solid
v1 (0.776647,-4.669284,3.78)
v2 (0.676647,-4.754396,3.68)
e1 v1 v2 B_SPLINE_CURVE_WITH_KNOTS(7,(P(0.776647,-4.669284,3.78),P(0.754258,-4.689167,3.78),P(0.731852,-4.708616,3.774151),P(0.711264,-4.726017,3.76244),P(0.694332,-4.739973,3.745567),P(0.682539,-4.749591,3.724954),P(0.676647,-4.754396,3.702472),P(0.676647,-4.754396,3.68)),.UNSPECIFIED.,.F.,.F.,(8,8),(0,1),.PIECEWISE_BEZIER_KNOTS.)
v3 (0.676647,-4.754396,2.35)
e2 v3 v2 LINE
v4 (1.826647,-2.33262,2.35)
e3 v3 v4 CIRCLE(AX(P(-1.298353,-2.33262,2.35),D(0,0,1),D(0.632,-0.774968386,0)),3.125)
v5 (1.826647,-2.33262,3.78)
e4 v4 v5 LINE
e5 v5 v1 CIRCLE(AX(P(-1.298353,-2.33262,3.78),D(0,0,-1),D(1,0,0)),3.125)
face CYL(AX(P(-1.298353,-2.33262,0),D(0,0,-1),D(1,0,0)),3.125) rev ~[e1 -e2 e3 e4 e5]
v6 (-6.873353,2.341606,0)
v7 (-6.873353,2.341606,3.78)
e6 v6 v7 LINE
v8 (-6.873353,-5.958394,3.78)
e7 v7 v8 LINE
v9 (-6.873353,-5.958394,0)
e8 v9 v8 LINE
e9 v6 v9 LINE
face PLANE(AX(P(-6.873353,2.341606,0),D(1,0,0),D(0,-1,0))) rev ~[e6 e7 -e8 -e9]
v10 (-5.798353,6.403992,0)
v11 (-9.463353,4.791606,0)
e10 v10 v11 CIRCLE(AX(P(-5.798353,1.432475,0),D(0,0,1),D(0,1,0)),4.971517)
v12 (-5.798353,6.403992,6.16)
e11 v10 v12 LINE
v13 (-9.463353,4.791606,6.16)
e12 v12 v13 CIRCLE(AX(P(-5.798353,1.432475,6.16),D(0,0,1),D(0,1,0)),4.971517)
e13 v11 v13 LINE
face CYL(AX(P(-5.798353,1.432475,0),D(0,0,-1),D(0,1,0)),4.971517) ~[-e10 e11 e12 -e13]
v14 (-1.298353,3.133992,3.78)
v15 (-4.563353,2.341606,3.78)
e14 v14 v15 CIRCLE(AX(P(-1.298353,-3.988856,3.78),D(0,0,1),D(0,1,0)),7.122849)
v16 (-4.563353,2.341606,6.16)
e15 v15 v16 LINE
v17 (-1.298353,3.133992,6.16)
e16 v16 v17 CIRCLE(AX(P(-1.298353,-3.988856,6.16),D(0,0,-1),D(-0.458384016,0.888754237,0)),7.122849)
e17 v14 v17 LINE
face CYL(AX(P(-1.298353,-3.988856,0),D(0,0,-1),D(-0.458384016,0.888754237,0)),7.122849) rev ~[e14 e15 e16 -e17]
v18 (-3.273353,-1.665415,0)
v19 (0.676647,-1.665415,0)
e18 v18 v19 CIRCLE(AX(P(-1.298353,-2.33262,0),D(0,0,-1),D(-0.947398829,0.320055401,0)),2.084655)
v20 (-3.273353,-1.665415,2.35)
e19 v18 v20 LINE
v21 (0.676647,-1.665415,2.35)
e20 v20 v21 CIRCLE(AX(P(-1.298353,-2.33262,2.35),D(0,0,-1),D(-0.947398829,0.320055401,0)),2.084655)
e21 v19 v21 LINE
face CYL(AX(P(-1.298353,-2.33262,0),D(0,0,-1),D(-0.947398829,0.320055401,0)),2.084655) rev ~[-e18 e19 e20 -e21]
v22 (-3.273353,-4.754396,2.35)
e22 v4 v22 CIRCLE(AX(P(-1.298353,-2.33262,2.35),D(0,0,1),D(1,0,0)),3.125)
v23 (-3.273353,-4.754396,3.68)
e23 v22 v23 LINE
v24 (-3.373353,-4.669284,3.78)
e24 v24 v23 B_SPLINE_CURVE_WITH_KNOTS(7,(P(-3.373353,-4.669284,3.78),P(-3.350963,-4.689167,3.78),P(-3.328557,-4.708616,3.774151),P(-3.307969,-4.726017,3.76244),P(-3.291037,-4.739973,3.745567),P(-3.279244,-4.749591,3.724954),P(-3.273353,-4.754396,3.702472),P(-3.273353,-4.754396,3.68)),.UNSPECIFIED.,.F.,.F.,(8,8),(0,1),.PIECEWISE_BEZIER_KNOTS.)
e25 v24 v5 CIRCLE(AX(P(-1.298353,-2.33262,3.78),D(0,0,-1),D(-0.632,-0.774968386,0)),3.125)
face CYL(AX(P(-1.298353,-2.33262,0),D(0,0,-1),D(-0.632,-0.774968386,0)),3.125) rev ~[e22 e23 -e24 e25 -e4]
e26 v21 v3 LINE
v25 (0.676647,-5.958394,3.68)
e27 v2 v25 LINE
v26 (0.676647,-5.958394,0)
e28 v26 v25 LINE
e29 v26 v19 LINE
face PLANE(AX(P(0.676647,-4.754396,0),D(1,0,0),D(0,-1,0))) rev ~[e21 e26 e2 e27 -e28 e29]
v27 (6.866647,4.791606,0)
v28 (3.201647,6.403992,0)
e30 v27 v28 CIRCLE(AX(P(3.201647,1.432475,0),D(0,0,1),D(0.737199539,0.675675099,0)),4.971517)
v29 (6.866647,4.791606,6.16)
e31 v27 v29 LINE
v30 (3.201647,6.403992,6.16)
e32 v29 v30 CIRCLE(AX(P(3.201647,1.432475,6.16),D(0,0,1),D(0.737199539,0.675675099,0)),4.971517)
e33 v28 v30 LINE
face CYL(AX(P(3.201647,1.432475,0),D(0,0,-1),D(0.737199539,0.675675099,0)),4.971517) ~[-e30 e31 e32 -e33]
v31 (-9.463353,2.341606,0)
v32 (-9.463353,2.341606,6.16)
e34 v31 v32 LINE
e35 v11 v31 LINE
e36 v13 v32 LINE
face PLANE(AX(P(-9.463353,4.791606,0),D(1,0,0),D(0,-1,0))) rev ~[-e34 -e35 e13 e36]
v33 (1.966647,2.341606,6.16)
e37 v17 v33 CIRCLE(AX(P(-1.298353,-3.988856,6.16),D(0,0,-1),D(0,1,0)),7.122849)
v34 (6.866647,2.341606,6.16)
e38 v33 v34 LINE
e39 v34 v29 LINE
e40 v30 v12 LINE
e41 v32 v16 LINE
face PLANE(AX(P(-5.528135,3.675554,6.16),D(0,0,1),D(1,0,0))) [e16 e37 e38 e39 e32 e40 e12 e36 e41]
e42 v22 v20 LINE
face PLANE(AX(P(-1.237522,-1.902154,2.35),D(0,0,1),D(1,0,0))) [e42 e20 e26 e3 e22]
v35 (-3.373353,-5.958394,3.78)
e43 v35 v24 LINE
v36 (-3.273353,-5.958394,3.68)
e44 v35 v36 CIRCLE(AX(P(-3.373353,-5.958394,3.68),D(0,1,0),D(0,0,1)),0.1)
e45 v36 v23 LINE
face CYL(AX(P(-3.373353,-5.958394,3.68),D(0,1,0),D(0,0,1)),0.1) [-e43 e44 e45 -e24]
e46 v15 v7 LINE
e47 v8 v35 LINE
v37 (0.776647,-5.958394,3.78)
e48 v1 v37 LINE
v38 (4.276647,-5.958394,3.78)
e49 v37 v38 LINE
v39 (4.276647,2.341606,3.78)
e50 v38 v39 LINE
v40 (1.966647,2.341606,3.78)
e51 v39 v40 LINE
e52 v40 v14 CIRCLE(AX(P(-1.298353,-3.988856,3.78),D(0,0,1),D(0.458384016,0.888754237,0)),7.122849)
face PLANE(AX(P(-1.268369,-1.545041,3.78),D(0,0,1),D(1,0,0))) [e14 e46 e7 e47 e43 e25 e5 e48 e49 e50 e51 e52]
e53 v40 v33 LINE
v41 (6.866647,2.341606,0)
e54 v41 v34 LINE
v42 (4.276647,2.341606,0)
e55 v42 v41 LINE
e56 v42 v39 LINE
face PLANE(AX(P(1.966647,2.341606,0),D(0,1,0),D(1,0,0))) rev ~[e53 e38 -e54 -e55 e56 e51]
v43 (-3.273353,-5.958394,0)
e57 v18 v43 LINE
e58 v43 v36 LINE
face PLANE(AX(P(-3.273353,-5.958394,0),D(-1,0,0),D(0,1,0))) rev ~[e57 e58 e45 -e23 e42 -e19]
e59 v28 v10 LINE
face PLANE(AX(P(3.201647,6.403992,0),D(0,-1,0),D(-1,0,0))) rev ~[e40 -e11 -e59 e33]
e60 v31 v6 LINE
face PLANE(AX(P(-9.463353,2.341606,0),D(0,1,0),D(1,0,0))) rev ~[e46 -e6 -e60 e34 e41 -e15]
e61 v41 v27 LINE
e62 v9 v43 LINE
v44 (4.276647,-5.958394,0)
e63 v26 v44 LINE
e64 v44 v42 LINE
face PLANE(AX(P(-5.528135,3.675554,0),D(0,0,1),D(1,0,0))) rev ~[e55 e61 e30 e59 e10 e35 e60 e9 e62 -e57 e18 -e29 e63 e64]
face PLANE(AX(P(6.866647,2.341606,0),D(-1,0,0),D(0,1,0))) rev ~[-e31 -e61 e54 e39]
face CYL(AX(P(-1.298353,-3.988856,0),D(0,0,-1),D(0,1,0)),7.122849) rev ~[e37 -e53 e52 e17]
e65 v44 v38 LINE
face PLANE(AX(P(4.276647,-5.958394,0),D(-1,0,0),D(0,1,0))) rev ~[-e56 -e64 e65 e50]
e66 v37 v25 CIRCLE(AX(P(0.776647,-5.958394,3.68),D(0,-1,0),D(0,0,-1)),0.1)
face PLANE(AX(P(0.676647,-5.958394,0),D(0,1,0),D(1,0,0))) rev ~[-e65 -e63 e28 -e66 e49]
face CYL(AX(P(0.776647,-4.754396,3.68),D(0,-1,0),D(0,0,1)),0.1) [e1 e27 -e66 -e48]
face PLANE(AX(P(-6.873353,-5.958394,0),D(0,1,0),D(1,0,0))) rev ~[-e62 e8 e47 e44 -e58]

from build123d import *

# Parameters (mm, degrees)
F1_DEPTH = 2.35
F2_DEPTH = 3.78
F3_DEPTH = 6.16
F4_R     = 0.1
F5_R     = 0.1


# Not quite as in the source:
# - a feature names something its author has since deleted; it is built from what else it names


with BuildPart() as f1:
    # F0 (on Top) → F1 (new body)
    with BuildSketch(Plane.XY):
        with BuildLine():
            Line((0.6766474014, -1.6654146139), (0.6766474014, -4.7543960131))
            ThreePointArc((0.6766474014, -4.7543960131), (1.524544849, -3.6730954673), (1.8266474014, -2.3326198054))
            ThreePointArc((1.8266474014, -2.3326198054), (-2.6388282605, 0.4902776422), (-3.2733525986, -4.7543960131))
            Line((-3.2733525986, -4.7543960131), (-3.2733525986, -1.6654146139))
            ThreePointArc((-3.2733525986, -1.6654146139), (-1.2983525986, -0.247964494), (0.6766474014, -1.6654146139))
        make_face()
    extrude(amount=F1_DEPTH)

    # F0 (on Top) → F2 (join)
    with BuildSketch(Plane.XY):
        with BuildLine():
            Line((4.2766474014, -5.9583943095), (4.2766474014, 2.3416056905))
            Line((4.2766474014, 2.3416056905), (1.9666474014, 2.3416056905))
            ThreePointArc((1.9666474014, 2.3416056905), (0.3815359204, 2.9330616855), (-1.2983525986, 3.1339924307))
            ThreePointArc((-1.2983525986, 3.1339924307), (-2.9782411177, 2.9330616855), (-4.5633525986, 2.3416056905))
            Line((-4.5633525986, 2.3416056905), (-6.8733525986, 2.3416056905))
            Line((-6.8733525986, 2.3416056905), (-6.8733525986, -5.9583943095))
            Line((-6.8733525986, -5.9583943095), (-3.2733525986, -5.9583943095))
            Line((-3.2733525986, -5.9583943095), (-3.2733525986, -4.7543960131))
            ThreePointArc((-3.2733525986, -4.7543960131), (-2.6388282605, 0.4902776422), (1.8266474014, -2.3326198054))
            ThreePointArc((1.8266474014, -2.3326198054), (1.524544849, -3.6730954673), (0.6766474014, -4.7543960131))
            Line((0.6766474014, -4.7543960131), (0.6766474014, -5.9583943095))
            Line((0.6766474014, -5.9583943095), (4.2766474014, -5.9583943095))
        make_face()
    extrude(amount=F2_DEPTH)

    # F0 (on Top) → F3 (join)
    with BuildSketch(Plane.XY):
        with BuildLine():
            ThreePointArc((-4.5633525986, 2.3416056905), (-2.9782411177, 2.9330616855), (-1.2983525986, 3.1339924307))
            Line((-1.2983525986, 3.1339924307), (-1.2983525986, 4.7916056905))
            Line((-1.2983525986, 4.7916056905), (-9.4633525986, 4.7916056905))
            Line((-9.4633525986, 4.7916056905), (-9.4633525986, 2.3416056905))
            Line((-9.4633525986, 2.3416056905), (-6.8733525986, 2.3416056905))
            Line((-6.8733525986, 2.3416056905), (-4.5633525986, 2.3416056905))
        make_face()
        with BuildLine():
            Line((1.9666474014, 2.3416056905), (4.2766474014, 2.3416056905))
            Line((4.2766474014, 2.3416056905), (6.8666474014, 2.3416056905))
            Line((6.8666474014, 2.3416056905), (6.8666474014, 4.7916056905))
            Line((6.8666474014, 4.7916056905), (-1.2983525986, 4.7916056905))
            Line((-1.2983525986, 4.7916056905), (-1.2983525986, 3.1339924307))
            ThreePointArc((-1.2983525986, 3.1339924307), (0.3815359204, 2.9330616855), (1.9666474014, 2.3416056905))
        make_face()
        with BuildLine():
            Line((-1.2983525986, 4.7916056905), (6.8666474014, 4.7916056905))
            ThreePointArc((6.8666474014, 4.7916056905), (5.2036474014, 5.9830772848), (3.2016474014, 6.4039924307))
            Line((3.2016474014, 6.4039924307), (-1.2983525986, 6.4039924307))
            Line((-1.2983525986, 6.4039924307), (-1.2983525986, 4.7916056905))
        make_face()
        with BuildLine():
            Line((-9.4633525986, 4.7916056905), (-1.2983525986, 4.7916056905))
            Line((-1.2983525986, 4.7916056905), (-1.2983525986, 6.4039924307))
            Line((-1.2983525986, 6.4039924307), (-5.7983525986, 6.4039924307))
            ThreePointArc((-5.7983525986, 6.4039924307), (-7.8003525986, 5.9830772848), (-9.4633525986, 4.7916056905))
        make_face()
    extrude(amount=F3_DEPTH)

    # F4
    f4_edges = [f1.edges().sort_by_distance(p)[0] for p in [
        (0.676647, -5.356395, 3.78),
    ]]
    fillet(f4_edges, radius=F4_R)

    # F5
    f5_edges = [f1.edges().sort_by_distance(p)[0] for p in [
        (-3.273353, -5.356395, 3.78),
    ]]
    fillet(f5_edges, radius=F5_R)


solid = f1.part
